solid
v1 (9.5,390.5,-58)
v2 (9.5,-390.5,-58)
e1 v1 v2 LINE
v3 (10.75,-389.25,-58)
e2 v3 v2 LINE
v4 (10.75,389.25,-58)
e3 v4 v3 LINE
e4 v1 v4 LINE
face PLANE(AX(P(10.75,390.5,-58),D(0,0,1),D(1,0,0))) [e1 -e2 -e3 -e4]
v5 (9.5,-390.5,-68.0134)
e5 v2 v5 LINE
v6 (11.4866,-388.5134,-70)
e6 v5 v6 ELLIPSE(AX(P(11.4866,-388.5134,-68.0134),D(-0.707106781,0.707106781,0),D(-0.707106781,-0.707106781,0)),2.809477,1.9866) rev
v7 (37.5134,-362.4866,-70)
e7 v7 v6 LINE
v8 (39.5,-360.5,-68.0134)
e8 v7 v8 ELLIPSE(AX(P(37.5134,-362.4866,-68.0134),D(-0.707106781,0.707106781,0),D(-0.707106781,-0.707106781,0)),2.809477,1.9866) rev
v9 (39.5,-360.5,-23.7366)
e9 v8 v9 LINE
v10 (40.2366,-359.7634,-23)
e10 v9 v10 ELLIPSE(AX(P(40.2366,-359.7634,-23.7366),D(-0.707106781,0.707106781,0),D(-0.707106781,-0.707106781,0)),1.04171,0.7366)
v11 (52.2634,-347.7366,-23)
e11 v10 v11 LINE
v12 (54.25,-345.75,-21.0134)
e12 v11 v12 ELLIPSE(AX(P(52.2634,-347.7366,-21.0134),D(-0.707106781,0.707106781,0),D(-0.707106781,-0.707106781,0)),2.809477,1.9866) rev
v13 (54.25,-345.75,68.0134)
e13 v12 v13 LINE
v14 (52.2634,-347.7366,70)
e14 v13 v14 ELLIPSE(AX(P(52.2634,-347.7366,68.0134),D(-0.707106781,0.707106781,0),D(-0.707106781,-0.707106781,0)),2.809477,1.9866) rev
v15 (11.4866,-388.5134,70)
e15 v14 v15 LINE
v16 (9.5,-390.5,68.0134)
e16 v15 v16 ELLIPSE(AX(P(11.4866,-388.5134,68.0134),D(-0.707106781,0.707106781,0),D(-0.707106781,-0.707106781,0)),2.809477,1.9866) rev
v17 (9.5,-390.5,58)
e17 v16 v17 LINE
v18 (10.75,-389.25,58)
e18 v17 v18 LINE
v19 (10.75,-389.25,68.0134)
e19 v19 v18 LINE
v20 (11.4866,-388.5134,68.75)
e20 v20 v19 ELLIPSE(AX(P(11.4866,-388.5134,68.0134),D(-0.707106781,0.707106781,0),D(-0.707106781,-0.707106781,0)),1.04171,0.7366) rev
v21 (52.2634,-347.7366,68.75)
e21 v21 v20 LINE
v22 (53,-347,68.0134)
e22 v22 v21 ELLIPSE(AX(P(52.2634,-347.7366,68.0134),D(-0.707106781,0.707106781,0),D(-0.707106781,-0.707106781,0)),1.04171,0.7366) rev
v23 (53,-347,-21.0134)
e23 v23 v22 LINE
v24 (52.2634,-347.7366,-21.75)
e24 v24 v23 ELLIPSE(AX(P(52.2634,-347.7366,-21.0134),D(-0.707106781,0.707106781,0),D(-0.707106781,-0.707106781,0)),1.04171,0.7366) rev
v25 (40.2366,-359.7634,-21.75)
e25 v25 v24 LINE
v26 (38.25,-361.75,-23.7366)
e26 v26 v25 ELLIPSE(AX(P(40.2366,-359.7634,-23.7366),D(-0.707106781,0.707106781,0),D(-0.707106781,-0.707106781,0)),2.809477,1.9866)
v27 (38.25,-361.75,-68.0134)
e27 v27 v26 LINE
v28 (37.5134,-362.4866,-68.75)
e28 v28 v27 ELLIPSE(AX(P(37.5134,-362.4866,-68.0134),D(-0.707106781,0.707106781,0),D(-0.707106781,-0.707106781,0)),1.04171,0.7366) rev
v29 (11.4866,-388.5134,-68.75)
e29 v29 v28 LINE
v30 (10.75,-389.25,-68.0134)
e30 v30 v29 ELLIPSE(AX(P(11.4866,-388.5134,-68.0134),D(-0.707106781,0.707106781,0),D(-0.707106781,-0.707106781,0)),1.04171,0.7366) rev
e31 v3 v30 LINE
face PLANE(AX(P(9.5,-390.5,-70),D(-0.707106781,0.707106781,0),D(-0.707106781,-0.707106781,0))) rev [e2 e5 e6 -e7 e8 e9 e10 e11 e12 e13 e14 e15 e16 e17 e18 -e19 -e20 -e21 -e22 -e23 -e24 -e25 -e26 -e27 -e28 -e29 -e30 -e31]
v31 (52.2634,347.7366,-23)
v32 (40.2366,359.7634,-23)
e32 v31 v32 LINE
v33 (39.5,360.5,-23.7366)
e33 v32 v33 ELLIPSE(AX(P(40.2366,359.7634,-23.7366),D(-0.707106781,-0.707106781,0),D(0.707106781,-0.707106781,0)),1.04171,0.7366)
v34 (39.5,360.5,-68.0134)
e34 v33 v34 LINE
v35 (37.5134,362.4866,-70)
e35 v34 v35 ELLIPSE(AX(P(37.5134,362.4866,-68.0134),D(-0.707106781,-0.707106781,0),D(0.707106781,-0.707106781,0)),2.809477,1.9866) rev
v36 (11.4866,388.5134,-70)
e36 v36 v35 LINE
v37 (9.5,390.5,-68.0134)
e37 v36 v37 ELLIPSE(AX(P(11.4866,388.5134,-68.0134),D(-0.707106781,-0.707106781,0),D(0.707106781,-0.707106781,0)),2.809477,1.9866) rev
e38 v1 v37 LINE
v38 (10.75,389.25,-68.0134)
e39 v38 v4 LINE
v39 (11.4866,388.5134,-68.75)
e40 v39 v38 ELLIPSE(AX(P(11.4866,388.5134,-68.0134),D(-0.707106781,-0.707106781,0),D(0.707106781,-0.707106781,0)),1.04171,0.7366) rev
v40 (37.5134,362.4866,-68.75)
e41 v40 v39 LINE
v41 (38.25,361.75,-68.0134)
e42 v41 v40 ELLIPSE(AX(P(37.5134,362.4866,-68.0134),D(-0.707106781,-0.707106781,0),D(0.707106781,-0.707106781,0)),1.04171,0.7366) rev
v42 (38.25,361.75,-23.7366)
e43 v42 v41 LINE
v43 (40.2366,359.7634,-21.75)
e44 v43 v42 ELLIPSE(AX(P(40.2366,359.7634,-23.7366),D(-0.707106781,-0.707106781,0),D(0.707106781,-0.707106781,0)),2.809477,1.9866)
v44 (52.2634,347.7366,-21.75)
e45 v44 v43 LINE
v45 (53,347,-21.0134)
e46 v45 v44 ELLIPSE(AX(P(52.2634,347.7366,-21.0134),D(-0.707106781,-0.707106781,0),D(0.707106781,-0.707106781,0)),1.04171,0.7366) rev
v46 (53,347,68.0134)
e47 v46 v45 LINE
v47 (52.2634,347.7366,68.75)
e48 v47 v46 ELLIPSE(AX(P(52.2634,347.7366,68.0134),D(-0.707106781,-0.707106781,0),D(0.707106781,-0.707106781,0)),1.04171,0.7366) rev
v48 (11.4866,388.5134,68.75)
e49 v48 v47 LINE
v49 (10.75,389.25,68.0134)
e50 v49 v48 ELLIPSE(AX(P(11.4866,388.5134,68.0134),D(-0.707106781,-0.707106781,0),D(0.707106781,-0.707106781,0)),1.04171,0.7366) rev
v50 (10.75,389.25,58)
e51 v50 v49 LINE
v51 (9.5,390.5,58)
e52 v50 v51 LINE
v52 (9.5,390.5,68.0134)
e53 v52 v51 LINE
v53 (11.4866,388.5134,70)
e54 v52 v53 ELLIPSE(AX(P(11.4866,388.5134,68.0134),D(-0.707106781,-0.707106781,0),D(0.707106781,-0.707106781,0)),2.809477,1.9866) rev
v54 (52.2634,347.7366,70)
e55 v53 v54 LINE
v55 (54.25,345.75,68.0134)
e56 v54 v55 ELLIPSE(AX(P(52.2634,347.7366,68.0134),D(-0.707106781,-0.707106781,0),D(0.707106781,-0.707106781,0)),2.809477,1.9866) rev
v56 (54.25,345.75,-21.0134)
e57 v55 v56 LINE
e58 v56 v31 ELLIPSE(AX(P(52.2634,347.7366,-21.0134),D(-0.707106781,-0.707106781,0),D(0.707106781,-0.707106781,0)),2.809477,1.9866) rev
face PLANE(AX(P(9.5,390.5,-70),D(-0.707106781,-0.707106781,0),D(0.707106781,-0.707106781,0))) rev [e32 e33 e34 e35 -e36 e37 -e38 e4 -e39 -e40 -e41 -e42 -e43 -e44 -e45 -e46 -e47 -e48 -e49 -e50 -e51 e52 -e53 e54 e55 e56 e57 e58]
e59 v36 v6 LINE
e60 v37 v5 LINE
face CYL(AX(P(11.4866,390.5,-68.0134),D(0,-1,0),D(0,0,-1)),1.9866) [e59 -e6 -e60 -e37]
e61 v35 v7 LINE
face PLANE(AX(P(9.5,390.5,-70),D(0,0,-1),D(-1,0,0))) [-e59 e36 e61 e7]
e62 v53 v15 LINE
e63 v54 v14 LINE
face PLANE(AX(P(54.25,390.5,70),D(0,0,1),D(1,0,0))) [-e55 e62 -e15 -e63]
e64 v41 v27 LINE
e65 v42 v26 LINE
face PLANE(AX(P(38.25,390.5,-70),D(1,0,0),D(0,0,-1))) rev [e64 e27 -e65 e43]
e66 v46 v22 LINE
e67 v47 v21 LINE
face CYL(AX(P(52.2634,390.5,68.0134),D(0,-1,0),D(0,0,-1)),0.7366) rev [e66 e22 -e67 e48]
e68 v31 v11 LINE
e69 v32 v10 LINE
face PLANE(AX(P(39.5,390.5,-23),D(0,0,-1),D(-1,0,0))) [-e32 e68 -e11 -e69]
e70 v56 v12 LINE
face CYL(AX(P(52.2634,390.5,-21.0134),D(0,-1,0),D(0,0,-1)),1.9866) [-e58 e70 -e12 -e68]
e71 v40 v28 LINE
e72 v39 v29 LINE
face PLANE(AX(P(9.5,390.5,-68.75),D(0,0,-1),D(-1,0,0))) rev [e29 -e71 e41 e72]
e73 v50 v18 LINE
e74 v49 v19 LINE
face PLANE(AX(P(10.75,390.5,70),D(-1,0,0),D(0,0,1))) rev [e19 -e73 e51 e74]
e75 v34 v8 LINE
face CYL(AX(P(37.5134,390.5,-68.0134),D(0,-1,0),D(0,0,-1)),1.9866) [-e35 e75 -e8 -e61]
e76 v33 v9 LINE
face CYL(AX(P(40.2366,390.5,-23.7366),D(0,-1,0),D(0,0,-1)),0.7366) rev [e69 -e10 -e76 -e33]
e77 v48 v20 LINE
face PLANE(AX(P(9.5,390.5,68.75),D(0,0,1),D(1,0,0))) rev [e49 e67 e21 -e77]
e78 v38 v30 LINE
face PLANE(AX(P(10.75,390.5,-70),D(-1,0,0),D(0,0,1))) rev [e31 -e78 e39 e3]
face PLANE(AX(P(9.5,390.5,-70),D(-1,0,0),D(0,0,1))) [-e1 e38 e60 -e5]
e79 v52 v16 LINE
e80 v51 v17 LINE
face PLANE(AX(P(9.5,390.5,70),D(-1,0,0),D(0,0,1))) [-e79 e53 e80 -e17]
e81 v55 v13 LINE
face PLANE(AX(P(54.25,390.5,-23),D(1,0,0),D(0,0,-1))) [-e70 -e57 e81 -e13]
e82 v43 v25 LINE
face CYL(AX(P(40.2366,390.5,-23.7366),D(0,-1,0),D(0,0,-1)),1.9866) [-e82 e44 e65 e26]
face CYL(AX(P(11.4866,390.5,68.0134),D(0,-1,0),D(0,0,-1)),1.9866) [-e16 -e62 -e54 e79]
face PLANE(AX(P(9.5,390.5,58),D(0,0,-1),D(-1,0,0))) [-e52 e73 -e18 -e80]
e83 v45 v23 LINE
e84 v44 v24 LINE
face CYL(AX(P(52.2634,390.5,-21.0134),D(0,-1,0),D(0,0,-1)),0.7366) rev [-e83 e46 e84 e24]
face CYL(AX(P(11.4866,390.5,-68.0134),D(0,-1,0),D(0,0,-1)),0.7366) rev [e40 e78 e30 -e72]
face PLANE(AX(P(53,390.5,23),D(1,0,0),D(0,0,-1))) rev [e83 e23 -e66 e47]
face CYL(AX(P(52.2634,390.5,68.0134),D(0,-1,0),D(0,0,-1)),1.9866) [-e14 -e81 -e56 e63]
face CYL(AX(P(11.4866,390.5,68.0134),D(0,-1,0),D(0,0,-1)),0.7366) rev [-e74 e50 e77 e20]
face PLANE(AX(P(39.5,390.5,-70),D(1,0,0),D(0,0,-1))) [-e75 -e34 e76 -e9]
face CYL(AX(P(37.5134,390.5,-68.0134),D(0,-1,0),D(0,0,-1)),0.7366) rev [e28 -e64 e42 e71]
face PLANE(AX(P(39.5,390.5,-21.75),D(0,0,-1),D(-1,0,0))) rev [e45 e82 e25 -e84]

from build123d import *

# Parameters (mm, degrees)
BASE_FLANGE1_DEPTH = 390.5
CUT_EXTRUDE2_DEPTH = 419.369827425


# Sheet-metal steps are written as plain solids
with BuildPart() as part:
    # Sketch1 → Base-Flange1 (new, symmetric)
    with BuildSketch(Plane(origin=(0, 0, 0), x_dir=(1, 0, 0), z_dir=(0, 1, 0))):
        with BuildLine():
            Line((9.5, 58), (9.5, 68.0134))
            ThreePointArc((9.5, 68.0134), (10.081861668, 69.418138332), (11.4866, 70))
            Line((11.4866, 70), (37.5134, 70))
            ThreePointArc((37.5134, 70), (38.918138332, 69.418138332), (39.5, 68.0134))
            Line((39.5, 68.0134), (39.5, 23.7366))
            ThreePointArc((39.5, 23.7366), (39.715745145, 23.215745145), (40.2366, 23))
            Line((40.2366, 23), (52.2634, 23))
            ThreePointArc((52.2634, 23), (53.668138332, 22.418138332), (54.25, 21.0134))
            Line((54.25, 21.0134), (54.25, 18))
            Line((54.25, 18), (54.25, -23))
            Line((54.25, -23), (54.25, -68.0134))
            ThreePointArc((54.25, -68.0134), (53.668138332, -69.418138332), (52.2634, -70))
            Line((52.2634, -70), (39.5, -70))
            Line((39.5, -70), (11.4866, -70))
            ThreePointArc((11.4866, -70), (10.081861668, -69.418138332), (9.5, -68.0134))
            Line((9.5, -68.0134), (9.5, -58))
            Line((9.5, -58), (10.75, -58))
            Line((10.75, -58), (10.75, -68.0134))
            ThreePointArc((10.75, -68.0134), (10.965745145, -68.534254855), (11.4866, -68.75))
            Line((11.4866, -68.75), (39.5, -68.75))
            Line((39.5, -68.75), (52.2634, -68.75))
            ThreePointArc((52.2634, -68.75), (52.784254855, -68.534254855), (53, -68.0134))
            Line((53, -68.0134), (53, -23))
            Line((53, -23), (53, 18))
            Line((53, 18), (53, 21.0134))
            ThreePointArc((53, 21.0134), (52.784254855, 21.534254855), (52.2634, 21.75))
            Line((52.2634, 21.75), (40.2366, 21.75))
            ThreePointArc((40.2366, 21.75), (38.831861668, 22.331861668), (38.25, 23.7366))
            Line((38.25, 23.7366), (38.25, 68.0134))
            ThreePointArc((38.25, 68.0134), (38.034254855, 68.534254855), (37.5134, 68.75))
            Line((37.5134, 68.75), (11.4866, 68.75))
            ThreePointArc((11.4866, 68.75), (10.965745145, 68.534254855), (10.75, 68.0134))
            Line((10.75, 68.0134), (10.75, 58))
            Line((10.75, 58), (9.5, 58))
        make_face()
    extrude(amount=BASE_FLANGE1_DEPTH, both=True)

    # Sketch2 → Cut-Extrude2 (cut, through all)
    with BuildSketch(Plane.XY.offset(70)):
        Polygon((9.5, -390.5), (204.29871247, -195.70128753), (123.087268974, -390.5), align=None)
        Polygon((123.087268974, 390.5), (9.5, 390.5), (204.29871247, 195.70128753), align=None)
    extrude(amount=-CUT_EXTRUDE2_DEPTH, mode=Mode.SUBTRACT)


solid = part.part
